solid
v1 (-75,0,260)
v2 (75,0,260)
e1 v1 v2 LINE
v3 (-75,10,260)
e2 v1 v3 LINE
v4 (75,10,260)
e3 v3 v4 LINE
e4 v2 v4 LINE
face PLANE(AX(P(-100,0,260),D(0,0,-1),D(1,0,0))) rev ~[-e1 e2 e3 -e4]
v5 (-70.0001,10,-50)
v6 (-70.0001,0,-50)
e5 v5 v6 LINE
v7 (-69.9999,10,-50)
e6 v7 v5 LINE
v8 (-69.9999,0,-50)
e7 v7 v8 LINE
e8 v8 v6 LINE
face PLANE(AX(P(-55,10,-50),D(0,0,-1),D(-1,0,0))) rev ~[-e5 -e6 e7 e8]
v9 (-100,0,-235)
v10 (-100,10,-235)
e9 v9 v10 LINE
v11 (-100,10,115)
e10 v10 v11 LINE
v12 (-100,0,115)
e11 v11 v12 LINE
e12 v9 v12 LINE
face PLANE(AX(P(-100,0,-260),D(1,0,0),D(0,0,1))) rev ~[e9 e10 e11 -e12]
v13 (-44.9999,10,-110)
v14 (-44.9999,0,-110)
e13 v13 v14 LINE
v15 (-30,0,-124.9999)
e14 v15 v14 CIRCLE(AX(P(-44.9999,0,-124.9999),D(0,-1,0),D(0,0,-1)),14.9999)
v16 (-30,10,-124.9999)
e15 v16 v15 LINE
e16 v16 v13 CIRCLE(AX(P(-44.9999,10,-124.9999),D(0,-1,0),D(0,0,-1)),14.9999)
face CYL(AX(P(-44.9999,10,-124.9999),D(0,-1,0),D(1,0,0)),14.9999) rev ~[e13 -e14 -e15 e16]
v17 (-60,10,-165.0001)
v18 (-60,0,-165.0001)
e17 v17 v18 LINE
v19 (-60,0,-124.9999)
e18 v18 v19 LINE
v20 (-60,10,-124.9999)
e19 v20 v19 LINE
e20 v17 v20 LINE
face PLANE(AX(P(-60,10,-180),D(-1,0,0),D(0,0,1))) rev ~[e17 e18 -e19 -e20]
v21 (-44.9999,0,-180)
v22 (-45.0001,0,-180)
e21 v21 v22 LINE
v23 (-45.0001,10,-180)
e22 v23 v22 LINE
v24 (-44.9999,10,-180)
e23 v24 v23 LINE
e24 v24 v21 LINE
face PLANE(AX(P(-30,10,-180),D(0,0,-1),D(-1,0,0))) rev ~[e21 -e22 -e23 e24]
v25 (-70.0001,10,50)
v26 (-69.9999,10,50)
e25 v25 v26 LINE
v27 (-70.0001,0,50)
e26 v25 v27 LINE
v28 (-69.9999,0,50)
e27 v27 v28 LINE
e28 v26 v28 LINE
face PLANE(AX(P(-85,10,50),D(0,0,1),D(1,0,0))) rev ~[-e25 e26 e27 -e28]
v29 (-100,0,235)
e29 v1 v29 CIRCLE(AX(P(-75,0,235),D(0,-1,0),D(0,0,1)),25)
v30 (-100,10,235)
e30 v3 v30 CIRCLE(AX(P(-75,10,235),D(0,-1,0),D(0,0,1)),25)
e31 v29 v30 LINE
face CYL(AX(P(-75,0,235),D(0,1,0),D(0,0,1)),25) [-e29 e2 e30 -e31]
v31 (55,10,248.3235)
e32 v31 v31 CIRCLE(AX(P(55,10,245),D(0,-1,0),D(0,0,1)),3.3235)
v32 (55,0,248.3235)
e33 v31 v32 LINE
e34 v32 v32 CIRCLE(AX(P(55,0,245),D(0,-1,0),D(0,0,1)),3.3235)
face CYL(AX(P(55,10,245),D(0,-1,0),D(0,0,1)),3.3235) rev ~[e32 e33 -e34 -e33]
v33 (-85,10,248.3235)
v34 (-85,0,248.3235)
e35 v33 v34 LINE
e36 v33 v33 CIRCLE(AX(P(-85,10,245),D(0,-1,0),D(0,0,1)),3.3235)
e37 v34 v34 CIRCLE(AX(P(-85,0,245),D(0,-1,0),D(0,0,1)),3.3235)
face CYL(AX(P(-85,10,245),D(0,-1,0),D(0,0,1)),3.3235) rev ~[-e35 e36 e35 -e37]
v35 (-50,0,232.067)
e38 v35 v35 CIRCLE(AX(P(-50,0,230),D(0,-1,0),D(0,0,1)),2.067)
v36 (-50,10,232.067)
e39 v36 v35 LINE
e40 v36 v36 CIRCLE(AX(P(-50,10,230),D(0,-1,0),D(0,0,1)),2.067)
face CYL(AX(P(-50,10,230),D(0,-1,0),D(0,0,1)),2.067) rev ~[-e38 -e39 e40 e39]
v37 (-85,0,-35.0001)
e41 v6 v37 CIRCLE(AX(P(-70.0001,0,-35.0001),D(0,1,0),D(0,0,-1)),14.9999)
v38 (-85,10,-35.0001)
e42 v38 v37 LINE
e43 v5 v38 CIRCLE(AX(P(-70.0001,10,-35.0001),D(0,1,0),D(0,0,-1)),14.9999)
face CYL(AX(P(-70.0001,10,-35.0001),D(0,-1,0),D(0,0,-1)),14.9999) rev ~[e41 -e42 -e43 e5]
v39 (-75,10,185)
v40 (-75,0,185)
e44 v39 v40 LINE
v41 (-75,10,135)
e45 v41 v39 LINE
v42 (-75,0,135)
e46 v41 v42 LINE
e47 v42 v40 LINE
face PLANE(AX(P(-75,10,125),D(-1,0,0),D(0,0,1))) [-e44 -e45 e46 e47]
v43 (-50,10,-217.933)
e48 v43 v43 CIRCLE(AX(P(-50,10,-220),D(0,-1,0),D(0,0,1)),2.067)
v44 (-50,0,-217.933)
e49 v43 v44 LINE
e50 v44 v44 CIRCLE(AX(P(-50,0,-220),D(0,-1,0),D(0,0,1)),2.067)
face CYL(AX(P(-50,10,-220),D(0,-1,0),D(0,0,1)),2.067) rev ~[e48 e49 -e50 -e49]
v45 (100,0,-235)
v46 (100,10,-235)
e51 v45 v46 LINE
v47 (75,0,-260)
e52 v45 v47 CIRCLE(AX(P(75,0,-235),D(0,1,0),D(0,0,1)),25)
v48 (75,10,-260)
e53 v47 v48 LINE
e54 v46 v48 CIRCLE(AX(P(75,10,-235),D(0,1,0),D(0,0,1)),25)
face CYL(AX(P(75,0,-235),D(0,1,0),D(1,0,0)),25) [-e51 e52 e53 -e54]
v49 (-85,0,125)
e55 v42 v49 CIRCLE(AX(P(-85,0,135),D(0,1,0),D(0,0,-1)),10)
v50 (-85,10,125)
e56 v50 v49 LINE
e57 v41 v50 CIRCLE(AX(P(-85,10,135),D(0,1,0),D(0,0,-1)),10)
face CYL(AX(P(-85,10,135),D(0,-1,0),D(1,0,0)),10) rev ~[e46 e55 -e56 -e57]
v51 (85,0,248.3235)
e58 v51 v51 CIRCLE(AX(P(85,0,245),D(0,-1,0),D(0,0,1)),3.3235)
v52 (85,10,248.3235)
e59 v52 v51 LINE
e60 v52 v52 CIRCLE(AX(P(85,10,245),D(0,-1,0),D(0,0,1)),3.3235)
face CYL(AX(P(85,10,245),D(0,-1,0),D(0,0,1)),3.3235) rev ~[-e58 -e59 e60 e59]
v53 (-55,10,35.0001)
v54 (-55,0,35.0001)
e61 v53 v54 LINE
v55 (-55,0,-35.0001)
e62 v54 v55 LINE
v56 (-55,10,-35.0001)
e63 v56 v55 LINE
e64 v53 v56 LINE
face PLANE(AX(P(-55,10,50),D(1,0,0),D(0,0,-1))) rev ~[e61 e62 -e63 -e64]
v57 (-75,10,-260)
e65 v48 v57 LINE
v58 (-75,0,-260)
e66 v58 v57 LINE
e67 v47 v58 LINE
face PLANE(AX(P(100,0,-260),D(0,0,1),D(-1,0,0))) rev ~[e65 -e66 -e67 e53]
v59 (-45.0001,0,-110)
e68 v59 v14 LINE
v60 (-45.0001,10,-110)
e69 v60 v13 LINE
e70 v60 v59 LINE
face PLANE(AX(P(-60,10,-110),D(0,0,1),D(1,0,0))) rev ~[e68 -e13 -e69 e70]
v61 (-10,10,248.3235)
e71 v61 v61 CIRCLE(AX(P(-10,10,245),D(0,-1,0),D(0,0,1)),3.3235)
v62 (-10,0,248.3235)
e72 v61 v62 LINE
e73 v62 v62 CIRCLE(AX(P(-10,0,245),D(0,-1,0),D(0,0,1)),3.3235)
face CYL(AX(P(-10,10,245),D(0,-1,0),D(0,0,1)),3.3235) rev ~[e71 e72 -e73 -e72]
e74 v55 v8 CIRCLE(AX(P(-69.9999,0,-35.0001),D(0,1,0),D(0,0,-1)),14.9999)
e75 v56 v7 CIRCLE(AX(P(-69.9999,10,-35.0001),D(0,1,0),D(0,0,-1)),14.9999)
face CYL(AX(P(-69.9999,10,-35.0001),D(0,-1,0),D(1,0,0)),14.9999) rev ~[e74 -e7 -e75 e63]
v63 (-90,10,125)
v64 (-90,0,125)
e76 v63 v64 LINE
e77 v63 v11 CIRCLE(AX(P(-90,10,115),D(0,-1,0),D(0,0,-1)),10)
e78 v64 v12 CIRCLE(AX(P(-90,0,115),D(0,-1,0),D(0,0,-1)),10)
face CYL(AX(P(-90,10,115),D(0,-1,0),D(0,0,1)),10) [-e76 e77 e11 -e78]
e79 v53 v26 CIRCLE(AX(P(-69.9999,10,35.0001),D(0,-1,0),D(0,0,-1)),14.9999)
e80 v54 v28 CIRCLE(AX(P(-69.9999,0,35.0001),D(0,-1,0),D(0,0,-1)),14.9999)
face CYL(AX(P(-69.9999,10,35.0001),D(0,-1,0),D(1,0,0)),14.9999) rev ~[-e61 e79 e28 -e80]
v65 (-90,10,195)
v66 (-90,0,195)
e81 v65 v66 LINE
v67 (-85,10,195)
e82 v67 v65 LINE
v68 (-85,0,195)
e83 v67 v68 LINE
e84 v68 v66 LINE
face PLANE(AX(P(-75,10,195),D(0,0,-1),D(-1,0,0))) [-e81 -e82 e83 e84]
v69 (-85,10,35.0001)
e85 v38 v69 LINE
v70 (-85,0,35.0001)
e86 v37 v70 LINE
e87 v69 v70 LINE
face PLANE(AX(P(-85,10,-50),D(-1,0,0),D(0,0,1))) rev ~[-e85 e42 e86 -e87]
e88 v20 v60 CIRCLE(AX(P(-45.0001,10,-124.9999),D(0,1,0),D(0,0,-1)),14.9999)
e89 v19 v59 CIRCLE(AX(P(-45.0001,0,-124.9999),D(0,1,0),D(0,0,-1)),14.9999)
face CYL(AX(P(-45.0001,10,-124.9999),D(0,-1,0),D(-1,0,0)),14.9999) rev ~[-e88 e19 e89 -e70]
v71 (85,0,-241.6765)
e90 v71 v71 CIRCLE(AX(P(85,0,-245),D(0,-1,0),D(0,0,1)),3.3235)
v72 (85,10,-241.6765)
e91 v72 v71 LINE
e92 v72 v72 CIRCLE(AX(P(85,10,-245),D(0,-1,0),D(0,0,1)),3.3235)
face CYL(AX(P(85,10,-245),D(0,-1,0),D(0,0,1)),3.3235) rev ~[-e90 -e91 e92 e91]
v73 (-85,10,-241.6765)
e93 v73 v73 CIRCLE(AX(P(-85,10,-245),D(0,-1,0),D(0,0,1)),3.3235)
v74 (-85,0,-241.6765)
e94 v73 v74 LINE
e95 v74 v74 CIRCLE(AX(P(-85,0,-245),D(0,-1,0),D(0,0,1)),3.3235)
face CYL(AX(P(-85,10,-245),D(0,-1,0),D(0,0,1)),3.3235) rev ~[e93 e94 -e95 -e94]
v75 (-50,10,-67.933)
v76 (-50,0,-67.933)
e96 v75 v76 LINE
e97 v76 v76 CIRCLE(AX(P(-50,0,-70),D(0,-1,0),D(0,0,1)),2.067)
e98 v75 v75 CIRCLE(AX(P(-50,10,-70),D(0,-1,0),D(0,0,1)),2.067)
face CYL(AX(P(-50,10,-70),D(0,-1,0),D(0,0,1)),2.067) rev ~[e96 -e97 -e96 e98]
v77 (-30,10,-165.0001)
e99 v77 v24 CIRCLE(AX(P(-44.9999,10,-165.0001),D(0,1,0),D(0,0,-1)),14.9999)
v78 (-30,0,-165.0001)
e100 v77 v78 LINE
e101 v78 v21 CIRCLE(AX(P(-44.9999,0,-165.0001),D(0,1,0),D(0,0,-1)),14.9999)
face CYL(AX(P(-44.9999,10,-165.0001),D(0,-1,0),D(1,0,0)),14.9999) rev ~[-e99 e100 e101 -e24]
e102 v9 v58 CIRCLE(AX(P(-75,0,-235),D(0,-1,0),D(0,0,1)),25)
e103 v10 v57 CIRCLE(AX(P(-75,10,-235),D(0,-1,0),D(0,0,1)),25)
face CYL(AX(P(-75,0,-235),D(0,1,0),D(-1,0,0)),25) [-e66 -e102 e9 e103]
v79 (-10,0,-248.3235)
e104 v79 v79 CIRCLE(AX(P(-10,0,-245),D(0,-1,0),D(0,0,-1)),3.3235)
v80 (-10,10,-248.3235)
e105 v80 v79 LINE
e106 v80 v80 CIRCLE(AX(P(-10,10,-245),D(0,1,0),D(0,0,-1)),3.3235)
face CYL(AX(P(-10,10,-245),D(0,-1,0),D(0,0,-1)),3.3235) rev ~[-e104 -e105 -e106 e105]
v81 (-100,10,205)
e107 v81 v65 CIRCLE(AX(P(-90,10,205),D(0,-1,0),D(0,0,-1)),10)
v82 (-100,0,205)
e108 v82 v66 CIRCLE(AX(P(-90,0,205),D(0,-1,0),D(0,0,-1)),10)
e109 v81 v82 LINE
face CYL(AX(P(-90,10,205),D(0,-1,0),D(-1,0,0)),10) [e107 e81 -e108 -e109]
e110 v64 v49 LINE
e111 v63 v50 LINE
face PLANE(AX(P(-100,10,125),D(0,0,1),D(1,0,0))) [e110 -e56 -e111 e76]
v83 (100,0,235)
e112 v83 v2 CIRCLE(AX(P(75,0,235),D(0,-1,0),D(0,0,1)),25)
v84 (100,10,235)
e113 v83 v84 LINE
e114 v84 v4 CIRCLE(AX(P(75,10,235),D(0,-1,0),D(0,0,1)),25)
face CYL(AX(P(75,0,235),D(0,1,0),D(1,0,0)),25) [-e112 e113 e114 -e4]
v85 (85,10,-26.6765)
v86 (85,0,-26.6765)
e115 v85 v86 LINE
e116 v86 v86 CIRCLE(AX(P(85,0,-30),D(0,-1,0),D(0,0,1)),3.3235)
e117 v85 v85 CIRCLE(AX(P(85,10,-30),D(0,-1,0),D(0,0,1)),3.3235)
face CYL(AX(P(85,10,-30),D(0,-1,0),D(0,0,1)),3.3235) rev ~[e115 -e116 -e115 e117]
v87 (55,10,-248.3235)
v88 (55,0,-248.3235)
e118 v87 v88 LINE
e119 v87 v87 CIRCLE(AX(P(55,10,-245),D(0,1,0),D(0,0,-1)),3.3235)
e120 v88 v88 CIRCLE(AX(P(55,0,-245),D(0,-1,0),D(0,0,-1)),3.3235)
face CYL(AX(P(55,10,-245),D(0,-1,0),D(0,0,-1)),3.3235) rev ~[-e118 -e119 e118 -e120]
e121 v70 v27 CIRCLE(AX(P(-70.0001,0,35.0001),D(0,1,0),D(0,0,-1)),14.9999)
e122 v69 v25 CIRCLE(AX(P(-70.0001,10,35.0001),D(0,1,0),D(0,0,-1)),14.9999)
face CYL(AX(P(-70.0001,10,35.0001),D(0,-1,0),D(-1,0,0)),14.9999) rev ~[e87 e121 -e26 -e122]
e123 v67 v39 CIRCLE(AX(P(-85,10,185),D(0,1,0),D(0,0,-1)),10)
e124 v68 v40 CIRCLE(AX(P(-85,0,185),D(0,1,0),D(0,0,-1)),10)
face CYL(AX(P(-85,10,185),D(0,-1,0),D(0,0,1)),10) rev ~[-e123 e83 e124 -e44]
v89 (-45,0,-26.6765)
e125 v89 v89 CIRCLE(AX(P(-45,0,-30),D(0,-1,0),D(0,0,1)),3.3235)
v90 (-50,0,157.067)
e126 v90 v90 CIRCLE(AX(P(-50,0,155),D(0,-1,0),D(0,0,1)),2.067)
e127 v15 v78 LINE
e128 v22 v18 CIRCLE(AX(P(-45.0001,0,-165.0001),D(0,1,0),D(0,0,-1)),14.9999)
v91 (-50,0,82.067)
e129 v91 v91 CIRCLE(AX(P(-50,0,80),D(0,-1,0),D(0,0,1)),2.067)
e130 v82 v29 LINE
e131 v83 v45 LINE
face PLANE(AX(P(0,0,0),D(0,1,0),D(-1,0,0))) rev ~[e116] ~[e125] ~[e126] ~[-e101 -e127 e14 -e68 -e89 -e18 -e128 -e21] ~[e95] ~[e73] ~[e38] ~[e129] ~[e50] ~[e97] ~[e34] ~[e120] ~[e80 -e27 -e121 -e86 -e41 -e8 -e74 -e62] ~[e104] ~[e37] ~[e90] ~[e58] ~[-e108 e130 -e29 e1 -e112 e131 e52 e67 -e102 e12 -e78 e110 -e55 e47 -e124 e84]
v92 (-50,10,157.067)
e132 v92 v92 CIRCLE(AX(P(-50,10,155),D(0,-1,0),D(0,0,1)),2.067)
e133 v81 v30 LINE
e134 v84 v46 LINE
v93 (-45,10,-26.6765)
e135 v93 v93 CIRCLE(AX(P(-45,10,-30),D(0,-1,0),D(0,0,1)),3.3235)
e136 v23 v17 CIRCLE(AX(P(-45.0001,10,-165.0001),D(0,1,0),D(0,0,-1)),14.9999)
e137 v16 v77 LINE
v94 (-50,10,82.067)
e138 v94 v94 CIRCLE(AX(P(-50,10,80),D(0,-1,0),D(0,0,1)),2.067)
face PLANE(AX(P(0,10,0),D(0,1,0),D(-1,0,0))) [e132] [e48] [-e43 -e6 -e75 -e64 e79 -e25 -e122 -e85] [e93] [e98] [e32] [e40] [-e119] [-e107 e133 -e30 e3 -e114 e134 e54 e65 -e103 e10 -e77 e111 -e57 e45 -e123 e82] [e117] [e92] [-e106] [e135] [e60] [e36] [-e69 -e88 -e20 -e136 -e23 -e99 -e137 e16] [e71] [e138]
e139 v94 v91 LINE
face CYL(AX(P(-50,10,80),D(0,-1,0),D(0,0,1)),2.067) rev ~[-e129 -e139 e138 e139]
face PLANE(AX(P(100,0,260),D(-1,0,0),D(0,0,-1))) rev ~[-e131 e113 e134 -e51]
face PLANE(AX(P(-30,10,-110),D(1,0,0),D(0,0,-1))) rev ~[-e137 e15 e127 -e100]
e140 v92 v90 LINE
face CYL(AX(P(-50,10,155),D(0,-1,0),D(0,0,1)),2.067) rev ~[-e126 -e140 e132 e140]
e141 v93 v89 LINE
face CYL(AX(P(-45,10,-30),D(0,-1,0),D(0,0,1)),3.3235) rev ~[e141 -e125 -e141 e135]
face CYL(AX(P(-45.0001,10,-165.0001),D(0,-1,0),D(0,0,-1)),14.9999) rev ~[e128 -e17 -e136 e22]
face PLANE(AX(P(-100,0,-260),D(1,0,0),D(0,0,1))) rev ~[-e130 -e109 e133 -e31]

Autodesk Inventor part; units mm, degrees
ref_plane "YZ Plane" through (0, 0, 0) normal (1, 0, 0) x (0, 1, 0)
ref_plane "XZ Plane" through (0, 0, 0) normal (0, 1, 0) x (-1, 0, 0)
ref_plane "XY Plane" through (0, 0, 0) normal (0, 0, 1) x (1, 0, 0)
sketch "Sketch1" plane through (0, 0, 0) normal (0, 1, 0) x (-1, 0, 0)
  line L0 (-100, -260) -> (100, -260)
  line L1 (100, -260) -> (100, 260)
  line L2 (100, 260) -> (-100, 260)
  line L3 (-100, 260) -> (-100, -260)
  line L4 (-100, -260) -> (100, 260) construction
  line L5 (100, -260) -> (-100, 260) construction
  point P0 (0, 0)
  dimension "d0" = 200
  dimension "d1" = 520
extrude "Extrusion1" add sketch "Sketch1" along normal blind 10
fillet "Fillet1" radius 25 4 edges at (-100, 5, -260) (-100, 5, 260) (100, 5, 260) (100, 5, -260)
sketch "Sketch2" plane through (0, 10, 0) normal (0, 1, 0) x (1, 0, 0)
  line L0 (100, -235) -> (100, 235) projected
  line L1 (-75, -260) -> (75, -260) projected
  point P0 (0, 0)
  point P1 (85, -245)
  dimension "d5" = 15
  dimension "d6" = 15
hole "Hole1" at (85, 10, 245) direction (0, -1, 0) diameter 6.647 end through all thread size "M8x1.25" class "6H" standard "ISO Metric profile"
pattern_linear "Rectangular Pattern1" count 2 spacing 170 along (-1, 0, 0) count 2 spacing 490 along (0, 0, -1) of "Hole1"
sketch "Sketch3" plane through (0, 10, 0) normal (0, 1, 0) x (1, 0, 0)
  line L0 (-75, -260) -> (75, -260) projected
  line L1 (-100, 235) -> (-100, -235) projected
  point P0 (0, 0)
  point P1 (-10, -245)
  point P2 (55, -245)
  dimension "d20" = 15
  dimension "d21" = 90
  dimension "d22" = 65
  dimension "d23" = 15
hole "Hole2" at (-10, 10, 245) at (55, 10, 245) direction (0, -1, 0) diameter 6.647 end through all thread size "M8x1.25" class "6H" standard "ISO Metric profile"
mirror "Mirror1" about plane through (0, 0, 0) normal (0, 0, 1) of "Hole2"
sketch "Sketch4" plane through (0, 10, 0) normal (0, 1, 0) x (1, 0, 0)
  line L0 (75, 260) -> (-75, 260) projected
  line L1 (100, -235) -> (100, 235) projected
  point P0 (0, 0)
  point P1 (-45, 30)
  point P2 (85, 30)
  dimension "d31" = 230
  dimension "d32" = 145
  dimension "d33" = 230
  dimension "d34" = 15
hole "Hole3" at (-45, 10, -30) at (85, 10, -30) direction (0, -1, 0) diameter 6.647 end through all thread size "M8x1.25" class "6H" standard "ISO Metric profile"
sketch "Sketch8" plane through (0, 10, 0) normal (0, 1, 0) x (1, 0, 0)
  line L0 (-100, 235) -> (-100, -235) projected
  line L1 (-100, -125) -> (-75, -125)
  line L2 (-75, -125) -> (-75, -195)
  line L3 (-75, -195) -> (-100, -195)
  line L4 (-100, -195) -> (-100, -125)
  line L5 (-75, -260) -> (75, -260) projected
  point P0 (0, 0)
  dimension "d72" = 25
  dimension "d73" = 70
  dimension "d74" = 65
extrude "Extrusion2" cut sketch "Sketch8" against normal blind 10
fillet "Fillet2" radius 10 4 edges at (-100, 5, 125) (-75, 5, 125) (-100, 5, 195) (-75, 5, 195)
sketch "Sketch9" plane through (0, 10, 0) normal (0, 1, 0) x (1, 0, 0)
  line L0 (-55, 50) -> (-85, 50)
  line L1 (-85, 50) -> (-85, -50)
  line L2 (-85, -50) -> (-55, -50)
  line L3 (-55, -50) -> (-55, 50)
  line L4 (-100, 235) -> (-100, -115) projected
  line L5 (75, 260) -> (-75, 260) projected
  point P0 (0, 0)
  dimension "d78" = 30
  dimension "d79" = 100
  dimension "d80" = 15
  dimension "d81" = 210
extrude "Extrusion3" cut sketch "Sketch9" against normal blind 10
fillet "Fillet3" radius 15 4 edges at (-55, 5, -50) (-55, 5, 50) (-85, 5, 50) (-85, 5, -50)
sketch "Sketch10" plane through (0, 10, 0) normal (0, 1, 0) x (1, 0, 0)
  line L0 (-30, 180) -> (-60, 180)
  line L1 (-60, 180) -> (-60, 110)
  line L2 (-60, 110) -> (-30, 110)
  line L3 (-30, 110) -> (-30, 180)
  line L4 (-100, 235) -> (-100, -115) projected
  line L5 (75, 260) -> (-75, 260) projected
  point P0 (0, 0)
  dimension "d85" = 30
  dimension "d86" = 70
  dimension "d87" = 40
  dimension "d88" = 80
extrude "Extrusion4" cut sketch "Sketch10" against normal blind 10
fillet "Fillet4" radius 15 4 edges at (-60, 5, -110) (-60, 5, -180) (-30, 5, -180) (-30, 5, -110)
sketch "Sketch11" plane through (0, 10, 0) normal (0, 1, 0) x (1, 0, 0)
  line L0 (-100, 235) -> (-100, -115) projected
  line L1 (-100, -205) -> (-100, -235) projected
  line L2 (75, 260) -> (-75, 260) projected
  line L3 (-75, -260) -> (75, -260) projected
  point P0 (0, 0)
  point P1 (-50, 220)
  point P2 (-50, 70)
  point P3 (-50, -80)
  point P4 (-50, -155)
  point P5 (-50, -230)
  dimension "d92" = 50
  dimension "d93" = 50
  dimension "d94" = 50
  dimension "d95" = 50
  dimension "d96" = 50
  dimension "d97" = 40
  dimension "d98" = 190
  dimension "d99" = 180
  dimension "d100" = 105
  dimension "d101" = 30
hole "Hole7" at (-50, 10, -220) at (-50, 10, -70) at (-50, 10, 80) at (-50, 10, 155) at (-50, 10, 230) direction (0, -1, 0) diameter 4.134 end through all thread size "M5x0.8" class "6H" standard "ISO Metric profile"
properties part number "Current_plate" material "Stainless Steel"
